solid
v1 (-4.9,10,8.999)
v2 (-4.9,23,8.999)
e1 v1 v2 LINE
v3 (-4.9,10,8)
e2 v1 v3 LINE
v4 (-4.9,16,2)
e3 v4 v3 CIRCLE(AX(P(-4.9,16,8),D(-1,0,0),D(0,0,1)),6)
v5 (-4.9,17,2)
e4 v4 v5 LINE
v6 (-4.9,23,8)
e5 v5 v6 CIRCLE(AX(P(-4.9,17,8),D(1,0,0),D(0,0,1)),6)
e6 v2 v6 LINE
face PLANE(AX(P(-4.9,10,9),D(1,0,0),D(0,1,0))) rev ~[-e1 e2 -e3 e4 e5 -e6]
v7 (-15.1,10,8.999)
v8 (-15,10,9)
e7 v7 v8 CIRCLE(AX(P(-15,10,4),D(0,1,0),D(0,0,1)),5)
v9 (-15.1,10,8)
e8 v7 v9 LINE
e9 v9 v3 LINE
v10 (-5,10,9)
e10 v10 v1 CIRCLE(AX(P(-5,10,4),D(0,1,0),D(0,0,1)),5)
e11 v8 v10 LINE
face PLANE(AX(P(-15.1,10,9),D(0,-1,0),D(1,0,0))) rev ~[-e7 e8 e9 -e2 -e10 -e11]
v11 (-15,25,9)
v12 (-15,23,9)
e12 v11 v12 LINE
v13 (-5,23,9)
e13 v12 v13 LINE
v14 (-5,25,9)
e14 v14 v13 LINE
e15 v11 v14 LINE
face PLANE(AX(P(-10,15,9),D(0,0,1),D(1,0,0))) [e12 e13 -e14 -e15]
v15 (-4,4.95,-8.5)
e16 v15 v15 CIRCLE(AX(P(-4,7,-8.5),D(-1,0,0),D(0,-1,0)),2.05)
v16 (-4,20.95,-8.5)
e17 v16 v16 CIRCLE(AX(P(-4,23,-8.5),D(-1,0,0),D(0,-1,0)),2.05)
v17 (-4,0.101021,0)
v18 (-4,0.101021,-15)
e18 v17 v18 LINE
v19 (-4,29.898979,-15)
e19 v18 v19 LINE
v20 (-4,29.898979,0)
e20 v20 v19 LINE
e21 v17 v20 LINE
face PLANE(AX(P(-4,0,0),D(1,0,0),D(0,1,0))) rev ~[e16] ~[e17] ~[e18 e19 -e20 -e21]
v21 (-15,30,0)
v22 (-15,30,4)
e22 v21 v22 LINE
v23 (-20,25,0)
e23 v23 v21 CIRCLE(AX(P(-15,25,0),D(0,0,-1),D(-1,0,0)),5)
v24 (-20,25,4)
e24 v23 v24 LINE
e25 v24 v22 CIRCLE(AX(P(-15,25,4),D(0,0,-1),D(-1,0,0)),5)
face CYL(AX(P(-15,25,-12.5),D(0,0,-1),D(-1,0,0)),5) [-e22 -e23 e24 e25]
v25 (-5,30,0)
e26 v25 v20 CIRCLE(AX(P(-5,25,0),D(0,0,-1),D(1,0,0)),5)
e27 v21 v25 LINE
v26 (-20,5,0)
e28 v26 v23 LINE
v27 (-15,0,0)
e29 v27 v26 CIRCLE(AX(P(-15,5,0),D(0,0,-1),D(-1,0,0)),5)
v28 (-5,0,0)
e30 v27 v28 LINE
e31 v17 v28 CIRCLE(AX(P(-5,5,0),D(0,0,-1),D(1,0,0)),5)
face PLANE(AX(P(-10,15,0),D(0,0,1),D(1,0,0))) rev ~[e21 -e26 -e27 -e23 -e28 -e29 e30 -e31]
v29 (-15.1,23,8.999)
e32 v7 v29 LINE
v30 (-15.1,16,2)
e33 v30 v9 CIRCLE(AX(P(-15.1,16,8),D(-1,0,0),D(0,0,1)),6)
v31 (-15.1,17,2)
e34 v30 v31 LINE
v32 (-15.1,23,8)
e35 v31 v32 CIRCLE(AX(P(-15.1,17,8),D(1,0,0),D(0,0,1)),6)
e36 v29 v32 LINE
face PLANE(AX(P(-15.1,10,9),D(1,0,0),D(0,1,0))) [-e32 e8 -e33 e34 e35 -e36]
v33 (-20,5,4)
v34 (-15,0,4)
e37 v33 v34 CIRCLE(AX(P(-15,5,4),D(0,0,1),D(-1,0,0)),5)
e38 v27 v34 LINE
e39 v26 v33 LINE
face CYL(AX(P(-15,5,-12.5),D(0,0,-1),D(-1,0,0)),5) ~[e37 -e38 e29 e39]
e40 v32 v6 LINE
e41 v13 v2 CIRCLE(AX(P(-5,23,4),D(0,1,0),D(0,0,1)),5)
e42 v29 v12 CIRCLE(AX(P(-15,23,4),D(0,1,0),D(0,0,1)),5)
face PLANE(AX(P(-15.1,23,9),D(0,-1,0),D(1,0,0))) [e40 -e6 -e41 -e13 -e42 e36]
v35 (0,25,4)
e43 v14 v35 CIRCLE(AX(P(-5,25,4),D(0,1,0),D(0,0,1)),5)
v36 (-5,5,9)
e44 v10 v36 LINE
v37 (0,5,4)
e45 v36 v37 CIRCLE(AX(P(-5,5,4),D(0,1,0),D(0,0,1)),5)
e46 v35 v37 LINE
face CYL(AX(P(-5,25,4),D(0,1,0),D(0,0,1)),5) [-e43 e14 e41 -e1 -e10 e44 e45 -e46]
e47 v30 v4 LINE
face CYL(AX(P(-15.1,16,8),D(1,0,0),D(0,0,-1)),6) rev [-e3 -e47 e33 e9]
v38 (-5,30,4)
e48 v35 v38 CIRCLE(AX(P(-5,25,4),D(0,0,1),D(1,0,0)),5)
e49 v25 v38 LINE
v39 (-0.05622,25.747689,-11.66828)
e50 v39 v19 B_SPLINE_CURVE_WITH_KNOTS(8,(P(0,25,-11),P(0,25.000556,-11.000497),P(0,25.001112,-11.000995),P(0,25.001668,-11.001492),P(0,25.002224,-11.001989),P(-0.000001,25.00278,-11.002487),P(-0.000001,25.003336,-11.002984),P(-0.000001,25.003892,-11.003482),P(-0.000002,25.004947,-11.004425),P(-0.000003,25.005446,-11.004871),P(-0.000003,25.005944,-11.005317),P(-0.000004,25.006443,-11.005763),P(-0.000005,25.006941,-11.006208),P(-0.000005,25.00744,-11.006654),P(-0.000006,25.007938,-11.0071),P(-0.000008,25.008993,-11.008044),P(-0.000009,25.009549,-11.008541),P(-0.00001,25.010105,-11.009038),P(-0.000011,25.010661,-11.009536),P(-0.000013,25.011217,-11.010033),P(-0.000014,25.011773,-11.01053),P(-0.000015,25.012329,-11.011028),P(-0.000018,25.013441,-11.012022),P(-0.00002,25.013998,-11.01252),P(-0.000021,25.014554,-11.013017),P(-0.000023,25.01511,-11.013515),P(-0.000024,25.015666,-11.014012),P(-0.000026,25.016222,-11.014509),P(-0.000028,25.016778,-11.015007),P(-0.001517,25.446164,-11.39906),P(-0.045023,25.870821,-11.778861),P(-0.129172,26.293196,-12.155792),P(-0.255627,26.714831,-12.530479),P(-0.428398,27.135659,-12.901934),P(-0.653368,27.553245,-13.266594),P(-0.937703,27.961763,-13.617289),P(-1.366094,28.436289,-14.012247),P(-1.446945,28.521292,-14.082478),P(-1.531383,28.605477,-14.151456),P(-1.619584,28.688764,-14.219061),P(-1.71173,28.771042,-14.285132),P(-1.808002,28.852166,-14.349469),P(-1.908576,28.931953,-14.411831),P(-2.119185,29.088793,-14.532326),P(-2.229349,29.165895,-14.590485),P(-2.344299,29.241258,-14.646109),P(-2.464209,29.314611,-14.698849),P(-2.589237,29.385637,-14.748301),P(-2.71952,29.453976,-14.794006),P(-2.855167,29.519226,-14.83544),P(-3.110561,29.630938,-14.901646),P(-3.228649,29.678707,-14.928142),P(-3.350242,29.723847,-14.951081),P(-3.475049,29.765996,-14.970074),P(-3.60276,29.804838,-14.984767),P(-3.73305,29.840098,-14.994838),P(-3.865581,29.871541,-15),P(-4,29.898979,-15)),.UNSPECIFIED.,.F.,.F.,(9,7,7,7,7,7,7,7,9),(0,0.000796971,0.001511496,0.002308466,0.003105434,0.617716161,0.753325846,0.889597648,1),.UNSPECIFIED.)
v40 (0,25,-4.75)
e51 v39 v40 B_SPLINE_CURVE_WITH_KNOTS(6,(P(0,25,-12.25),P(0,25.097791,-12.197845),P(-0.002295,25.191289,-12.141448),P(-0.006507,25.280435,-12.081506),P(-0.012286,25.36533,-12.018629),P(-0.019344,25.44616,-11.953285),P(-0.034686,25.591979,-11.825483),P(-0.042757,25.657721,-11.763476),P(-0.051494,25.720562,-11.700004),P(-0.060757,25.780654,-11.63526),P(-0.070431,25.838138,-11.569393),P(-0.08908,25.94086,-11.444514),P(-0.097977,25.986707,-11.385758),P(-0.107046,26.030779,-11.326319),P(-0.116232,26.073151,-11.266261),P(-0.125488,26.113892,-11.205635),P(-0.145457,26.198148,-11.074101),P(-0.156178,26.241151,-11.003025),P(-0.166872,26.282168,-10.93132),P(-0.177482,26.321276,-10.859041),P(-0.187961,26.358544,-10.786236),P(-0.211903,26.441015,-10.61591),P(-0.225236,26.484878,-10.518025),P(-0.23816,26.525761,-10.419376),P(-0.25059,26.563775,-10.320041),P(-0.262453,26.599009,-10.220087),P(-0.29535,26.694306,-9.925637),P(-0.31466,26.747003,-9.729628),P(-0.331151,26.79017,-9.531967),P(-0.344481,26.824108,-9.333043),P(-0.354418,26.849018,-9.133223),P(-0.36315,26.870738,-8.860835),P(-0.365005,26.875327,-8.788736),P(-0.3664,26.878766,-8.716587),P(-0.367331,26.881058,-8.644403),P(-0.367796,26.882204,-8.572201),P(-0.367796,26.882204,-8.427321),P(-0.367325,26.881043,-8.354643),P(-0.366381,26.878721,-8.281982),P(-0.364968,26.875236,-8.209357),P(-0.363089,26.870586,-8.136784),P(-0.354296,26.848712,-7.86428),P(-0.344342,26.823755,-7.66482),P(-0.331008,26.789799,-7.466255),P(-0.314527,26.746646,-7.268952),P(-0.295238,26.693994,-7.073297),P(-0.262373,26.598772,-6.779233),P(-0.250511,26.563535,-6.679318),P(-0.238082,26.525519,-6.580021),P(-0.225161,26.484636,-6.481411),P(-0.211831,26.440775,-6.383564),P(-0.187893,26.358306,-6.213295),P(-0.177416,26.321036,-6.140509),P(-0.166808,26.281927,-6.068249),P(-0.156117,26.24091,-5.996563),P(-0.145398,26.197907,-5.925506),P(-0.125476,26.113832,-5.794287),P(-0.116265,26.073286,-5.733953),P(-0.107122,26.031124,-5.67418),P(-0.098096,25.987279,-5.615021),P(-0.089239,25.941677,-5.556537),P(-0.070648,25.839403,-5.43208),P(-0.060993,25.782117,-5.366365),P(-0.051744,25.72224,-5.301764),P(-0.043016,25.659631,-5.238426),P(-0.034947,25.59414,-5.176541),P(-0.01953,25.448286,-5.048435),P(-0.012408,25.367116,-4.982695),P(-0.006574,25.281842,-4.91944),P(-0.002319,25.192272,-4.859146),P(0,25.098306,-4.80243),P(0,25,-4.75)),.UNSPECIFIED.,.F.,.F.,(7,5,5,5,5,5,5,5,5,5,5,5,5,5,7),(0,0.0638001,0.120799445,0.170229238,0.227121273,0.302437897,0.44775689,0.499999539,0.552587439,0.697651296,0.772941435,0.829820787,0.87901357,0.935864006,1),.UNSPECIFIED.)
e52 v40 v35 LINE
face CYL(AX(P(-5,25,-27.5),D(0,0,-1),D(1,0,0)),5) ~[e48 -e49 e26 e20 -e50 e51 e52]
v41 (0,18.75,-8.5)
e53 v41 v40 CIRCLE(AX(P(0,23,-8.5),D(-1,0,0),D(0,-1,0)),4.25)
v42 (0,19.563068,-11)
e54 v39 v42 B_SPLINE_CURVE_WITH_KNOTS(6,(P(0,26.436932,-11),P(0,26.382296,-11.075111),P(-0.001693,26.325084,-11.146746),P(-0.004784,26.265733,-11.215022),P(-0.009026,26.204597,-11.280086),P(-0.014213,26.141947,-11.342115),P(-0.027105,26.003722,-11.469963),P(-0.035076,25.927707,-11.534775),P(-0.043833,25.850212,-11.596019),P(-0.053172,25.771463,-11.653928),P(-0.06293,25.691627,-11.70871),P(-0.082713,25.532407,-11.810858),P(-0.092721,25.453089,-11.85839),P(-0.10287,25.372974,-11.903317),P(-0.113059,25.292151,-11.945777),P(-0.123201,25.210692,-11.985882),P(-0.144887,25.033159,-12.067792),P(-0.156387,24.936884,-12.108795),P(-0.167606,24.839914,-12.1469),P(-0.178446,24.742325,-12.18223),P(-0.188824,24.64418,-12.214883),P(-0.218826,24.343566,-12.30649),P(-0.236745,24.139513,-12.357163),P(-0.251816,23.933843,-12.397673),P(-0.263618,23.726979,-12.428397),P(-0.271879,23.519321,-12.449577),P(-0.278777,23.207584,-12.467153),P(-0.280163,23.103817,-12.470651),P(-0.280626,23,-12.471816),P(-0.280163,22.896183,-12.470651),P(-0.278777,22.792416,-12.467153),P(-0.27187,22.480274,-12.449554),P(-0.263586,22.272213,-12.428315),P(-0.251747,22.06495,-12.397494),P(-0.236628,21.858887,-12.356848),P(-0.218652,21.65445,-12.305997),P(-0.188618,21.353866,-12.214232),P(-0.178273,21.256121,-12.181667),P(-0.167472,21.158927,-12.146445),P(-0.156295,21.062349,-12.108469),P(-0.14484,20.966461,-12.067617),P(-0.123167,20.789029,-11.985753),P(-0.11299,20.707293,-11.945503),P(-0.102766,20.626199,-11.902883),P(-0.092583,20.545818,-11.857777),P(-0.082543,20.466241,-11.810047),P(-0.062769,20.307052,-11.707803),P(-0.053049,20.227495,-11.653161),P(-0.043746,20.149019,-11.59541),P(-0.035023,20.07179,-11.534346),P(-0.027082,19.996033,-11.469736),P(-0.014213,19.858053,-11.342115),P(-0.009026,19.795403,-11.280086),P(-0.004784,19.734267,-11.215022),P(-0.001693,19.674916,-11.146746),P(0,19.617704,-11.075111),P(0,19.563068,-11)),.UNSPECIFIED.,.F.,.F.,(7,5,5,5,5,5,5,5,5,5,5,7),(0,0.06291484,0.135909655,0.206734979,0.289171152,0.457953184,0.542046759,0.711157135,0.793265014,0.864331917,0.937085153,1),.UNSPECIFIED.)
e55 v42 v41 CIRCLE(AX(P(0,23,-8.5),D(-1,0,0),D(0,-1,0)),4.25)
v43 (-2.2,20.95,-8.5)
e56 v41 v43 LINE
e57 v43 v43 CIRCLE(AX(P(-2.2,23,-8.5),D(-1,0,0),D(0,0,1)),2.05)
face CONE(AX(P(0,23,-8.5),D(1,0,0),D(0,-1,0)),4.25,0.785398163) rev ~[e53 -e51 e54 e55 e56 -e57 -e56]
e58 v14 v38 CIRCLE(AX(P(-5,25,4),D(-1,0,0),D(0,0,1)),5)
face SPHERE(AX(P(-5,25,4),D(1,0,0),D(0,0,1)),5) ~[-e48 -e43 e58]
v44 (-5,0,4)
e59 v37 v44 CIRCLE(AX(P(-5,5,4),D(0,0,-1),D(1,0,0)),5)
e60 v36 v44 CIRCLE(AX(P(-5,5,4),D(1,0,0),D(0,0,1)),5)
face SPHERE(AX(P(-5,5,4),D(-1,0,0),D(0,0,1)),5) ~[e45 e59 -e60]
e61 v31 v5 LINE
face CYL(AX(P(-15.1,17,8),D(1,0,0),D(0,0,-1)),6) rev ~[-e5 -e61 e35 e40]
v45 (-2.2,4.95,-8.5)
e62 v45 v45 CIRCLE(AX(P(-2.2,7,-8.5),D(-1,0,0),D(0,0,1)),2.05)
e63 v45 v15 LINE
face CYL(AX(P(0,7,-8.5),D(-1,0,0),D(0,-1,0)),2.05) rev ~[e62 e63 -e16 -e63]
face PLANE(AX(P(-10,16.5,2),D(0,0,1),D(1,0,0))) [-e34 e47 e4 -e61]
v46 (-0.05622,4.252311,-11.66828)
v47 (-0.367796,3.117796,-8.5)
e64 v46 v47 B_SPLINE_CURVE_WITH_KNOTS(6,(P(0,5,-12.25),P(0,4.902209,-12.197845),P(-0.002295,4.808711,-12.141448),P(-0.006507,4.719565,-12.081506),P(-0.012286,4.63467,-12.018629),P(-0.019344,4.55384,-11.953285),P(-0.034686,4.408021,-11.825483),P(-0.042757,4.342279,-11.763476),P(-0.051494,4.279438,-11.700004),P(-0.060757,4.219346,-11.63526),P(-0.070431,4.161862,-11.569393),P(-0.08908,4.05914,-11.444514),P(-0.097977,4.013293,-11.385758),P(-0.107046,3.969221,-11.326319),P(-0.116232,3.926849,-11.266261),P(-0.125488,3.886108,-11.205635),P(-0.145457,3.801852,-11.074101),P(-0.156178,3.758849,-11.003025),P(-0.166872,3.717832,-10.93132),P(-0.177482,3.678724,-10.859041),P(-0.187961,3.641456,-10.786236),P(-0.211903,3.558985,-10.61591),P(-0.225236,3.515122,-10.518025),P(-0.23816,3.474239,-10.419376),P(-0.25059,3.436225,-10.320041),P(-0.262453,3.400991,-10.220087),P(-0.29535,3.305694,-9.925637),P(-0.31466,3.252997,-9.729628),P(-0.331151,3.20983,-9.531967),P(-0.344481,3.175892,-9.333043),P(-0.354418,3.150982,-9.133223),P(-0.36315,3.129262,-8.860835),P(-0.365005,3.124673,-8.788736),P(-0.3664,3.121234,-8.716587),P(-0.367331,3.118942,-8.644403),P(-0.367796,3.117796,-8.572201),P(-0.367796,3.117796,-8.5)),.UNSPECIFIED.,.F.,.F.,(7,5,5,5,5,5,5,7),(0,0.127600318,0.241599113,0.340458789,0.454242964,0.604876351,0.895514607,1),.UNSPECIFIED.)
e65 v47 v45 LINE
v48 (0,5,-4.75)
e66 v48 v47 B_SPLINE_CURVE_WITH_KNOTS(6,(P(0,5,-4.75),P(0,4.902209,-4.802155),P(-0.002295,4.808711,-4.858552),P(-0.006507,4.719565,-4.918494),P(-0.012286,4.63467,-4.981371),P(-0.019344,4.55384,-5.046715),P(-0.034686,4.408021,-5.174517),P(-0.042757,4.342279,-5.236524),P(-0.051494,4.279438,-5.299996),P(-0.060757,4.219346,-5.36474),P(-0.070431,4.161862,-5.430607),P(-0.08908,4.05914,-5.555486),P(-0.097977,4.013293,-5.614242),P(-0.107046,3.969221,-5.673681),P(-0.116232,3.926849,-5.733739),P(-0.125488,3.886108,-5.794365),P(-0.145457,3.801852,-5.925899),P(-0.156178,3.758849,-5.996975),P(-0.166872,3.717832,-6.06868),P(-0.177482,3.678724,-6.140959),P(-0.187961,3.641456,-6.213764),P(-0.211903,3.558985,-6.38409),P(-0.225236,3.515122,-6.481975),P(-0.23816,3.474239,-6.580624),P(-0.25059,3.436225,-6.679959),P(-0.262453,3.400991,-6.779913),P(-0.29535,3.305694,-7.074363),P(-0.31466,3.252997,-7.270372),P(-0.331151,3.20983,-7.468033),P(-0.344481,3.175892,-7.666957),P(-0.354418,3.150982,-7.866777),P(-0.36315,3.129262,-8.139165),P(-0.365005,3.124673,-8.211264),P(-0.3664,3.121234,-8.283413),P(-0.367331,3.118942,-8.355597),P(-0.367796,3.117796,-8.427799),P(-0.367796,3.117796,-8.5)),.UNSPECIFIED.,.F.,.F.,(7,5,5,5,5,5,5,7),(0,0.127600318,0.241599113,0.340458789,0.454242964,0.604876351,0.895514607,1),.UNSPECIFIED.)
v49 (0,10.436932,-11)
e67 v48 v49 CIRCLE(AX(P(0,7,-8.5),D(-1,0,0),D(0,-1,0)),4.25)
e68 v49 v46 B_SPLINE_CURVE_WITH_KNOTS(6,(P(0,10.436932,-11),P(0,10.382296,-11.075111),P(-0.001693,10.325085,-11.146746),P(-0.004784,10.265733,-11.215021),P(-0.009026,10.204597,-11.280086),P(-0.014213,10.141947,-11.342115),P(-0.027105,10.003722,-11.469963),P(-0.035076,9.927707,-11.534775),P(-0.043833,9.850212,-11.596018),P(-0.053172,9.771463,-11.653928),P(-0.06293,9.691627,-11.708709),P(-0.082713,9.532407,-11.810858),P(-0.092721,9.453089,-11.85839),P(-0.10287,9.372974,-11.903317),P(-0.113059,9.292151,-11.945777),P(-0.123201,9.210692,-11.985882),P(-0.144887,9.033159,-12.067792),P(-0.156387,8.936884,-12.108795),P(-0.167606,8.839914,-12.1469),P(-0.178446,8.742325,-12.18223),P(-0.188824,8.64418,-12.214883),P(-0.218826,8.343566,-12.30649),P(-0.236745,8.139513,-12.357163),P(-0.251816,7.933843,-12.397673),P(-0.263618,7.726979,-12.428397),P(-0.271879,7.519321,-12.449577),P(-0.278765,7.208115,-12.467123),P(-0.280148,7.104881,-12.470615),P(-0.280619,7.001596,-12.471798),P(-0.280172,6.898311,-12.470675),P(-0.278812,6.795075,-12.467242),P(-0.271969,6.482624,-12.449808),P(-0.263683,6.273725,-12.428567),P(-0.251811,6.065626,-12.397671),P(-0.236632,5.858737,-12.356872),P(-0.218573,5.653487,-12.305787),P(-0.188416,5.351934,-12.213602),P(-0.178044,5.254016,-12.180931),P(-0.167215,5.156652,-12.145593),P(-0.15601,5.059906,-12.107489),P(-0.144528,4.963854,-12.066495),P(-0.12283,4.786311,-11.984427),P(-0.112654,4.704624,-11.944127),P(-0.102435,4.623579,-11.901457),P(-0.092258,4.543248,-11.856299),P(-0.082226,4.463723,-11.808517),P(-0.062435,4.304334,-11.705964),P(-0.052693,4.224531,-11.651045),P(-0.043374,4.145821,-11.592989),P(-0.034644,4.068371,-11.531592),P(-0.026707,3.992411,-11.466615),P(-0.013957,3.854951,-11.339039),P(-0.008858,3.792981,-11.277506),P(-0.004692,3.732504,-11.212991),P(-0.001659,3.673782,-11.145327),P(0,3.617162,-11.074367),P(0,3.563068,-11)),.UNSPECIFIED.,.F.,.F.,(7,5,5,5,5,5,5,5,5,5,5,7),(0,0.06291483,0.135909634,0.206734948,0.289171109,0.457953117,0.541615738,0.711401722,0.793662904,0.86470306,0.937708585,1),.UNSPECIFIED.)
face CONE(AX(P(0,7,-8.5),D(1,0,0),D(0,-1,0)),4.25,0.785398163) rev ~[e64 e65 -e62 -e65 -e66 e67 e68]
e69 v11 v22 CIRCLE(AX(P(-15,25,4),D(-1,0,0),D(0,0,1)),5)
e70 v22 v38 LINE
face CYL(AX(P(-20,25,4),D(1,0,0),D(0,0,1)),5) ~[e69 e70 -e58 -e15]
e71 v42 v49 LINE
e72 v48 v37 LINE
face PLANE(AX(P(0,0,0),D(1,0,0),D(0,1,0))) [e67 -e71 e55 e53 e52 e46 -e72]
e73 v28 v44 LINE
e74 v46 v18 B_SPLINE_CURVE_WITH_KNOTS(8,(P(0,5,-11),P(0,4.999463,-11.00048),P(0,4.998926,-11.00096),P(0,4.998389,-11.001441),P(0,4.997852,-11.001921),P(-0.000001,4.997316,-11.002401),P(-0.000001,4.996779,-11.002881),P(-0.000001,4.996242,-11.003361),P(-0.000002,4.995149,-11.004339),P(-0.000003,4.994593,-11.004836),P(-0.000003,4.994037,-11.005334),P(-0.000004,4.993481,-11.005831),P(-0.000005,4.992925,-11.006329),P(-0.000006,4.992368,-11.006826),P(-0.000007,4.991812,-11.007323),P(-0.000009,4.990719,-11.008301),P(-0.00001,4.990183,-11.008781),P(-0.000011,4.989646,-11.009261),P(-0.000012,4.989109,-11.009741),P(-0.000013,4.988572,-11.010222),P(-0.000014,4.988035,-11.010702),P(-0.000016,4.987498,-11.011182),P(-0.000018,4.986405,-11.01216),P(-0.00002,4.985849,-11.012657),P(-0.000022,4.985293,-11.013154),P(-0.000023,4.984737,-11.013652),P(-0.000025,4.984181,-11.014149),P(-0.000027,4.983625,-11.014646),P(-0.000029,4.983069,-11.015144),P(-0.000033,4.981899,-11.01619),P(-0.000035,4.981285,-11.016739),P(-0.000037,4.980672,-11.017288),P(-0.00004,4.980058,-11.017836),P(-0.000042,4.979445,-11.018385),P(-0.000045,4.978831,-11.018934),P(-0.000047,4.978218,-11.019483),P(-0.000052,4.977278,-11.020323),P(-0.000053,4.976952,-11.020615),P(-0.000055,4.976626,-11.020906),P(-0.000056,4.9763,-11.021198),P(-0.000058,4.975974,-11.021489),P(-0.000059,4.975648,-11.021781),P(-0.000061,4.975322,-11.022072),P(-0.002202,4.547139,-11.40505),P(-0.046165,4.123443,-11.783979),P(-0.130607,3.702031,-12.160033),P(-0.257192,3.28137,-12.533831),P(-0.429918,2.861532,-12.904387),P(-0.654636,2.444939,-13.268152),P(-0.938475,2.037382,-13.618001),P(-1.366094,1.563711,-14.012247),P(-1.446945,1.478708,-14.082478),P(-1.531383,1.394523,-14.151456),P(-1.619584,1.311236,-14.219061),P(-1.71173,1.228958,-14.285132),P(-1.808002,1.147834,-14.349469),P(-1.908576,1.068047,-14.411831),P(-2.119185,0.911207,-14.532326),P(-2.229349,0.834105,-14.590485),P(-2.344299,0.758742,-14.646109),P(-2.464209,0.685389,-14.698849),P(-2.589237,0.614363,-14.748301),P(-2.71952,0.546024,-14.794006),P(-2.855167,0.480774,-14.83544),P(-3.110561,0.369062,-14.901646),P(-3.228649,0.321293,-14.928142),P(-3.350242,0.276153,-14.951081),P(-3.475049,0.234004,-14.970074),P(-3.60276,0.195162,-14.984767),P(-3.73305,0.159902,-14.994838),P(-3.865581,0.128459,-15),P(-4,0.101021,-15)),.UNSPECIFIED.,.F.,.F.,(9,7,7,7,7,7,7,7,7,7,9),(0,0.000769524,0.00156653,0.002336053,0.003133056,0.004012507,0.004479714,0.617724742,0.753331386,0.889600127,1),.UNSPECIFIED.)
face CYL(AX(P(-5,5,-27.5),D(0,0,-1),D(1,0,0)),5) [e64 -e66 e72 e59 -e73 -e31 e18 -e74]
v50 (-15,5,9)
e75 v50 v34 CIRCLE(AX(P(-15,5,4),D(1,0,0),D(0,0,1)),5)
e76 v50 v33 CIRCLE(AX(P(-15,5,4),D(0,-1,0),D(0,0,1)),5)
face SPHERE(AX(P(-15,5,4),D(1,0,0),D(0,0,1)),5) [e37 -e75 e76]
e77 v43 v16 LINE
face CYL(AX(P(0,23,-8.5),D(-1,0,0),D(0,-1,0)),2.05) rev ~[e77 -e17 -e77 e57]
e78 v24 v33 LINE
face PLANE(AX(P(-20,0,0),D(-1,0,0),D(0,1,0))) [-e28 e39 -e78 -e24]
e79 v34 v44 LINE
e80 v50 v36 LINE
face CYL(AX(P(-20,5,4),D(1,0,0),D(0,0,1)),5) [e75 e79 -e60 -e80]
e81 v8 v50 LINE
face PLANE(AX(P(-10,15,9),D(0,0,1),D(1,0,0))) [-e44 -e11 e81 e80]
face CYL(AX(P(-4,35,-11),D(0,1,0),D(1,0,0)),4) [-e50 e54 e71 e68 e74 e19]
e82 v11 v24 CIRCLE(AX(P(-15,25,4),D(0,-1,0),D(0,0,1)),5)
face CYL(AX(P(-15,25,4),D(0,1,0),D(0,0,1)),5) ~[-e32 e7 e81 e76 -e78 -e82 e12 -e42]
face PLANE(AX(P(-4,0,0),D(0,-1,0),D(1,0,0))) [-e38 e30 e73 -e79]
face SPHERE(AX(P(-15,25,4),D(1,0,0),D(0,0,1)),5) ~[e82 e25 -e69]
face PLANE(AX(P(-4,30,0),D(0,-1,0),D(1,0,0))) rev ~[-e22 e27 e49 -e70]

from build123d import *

# Parameters (mm, degrees)
F0_W            = 20
F0_H            = 30
F1_DEPTH        = 9
F4_W            = 10.2
F4_H            = 13
F5_DEPTH        = 7
F2_W            = 4
F2_H            = 30
F6_DEPTH        = 15
F7_R            = 6
F10_D           = 4.1
F10_CSINK_D     = 8.5
F10_CSINK_ANGLE = 90
F11_F1_R        = 5
F11_F2_R        = 5
F11_T3_DEPTH    = 20
F11_T5_DEPTH    = 16.5
F11_T8_ANGLE    = 90
F11_T10_ANGLE   = 90
F11_T11_DEPTH   = 20
F11_T13_DEPTH   = 31.5
F11_T16_ANGLE   = 90
F11_T18_ANGLE   = 90
F13_T1_DEPTH    = 40


# Not quite as in the source:
# - a fillet or chamfer that OpenCascade refuses, or shapes differently, is made with other operations: its cross-section is extruded or revolved along the edge and cut away or added
# - a feature of the source that left no trace in its solid (it failed there, or was rolled back) is left out


with BuildPart() as f1:
    # F0 (on Top) → F1 (new body)
    with BuildSketch(Plane.XY):
        with Locations((-10, 15)):
            Rectangle(F0_W, F0_H)
    extrude(amount=F1_DEPTH)

    # F4 (on offset) → F5 (cut)
    with BuildSketch(Plane.XY.offset(9)):
        with Locations((-10, 16.5)):
            Rectangle(F4_W, F4_H)
    extrude(amount=-F5_DEPTH, mode=Mode.SUBTRACT)

    # F2 (on Top) → F6 (join)
    with BuildSketch(Plane.XY):
        with Locations((-2, 15)):
            Rectangle(F2_W, F2_H)
    extrude(amount=-F6_DEPTH)

    # F7
    f7_edges = [f1.edges().sort_by_distance(p)[0] for p in [
        (-10, 10, 2),
        (-10, 23, 2),
    ]]
    fillet(f7_edges, radius=F7_R)

    # F10 (through all)
    with Locations(Plane.YZ):
        with Locations((7, -8.5), (23, -8.5)):
            CounterSinkHole(F10_D / 2, F10_CSINK_D / 2, counter_sink_angle=F10_CSINK_ANGLE)

    # F11: fillet of radius 5 on 4 edges, made by hand

    # F11_f1
    f11_f1_edges = [f1.edges().sort_by_distance(p)[0] for p in [
        (-10, 0, 9),
    ]]
    fillet(f11_f1_edges, radius=F11_F1_R)

    # F11_f2
    f11_f2_edges = [f1.edges().sort_by_distance(p)[0] for p in [
        (-10, 30, 9),
    ]]
    fillet(f11_f2_edges, radius=F11_F2_R)

    # F11_s4 → F11_t3 (cut)
    with BuildSketch(Plane.XZ.offset(-25)):
        with BuildLine():
            ThreePointArc((-15, 9), (-18.5355339059, 7.5355339059), (-20, 4))
            Line((-20, 4), (-20.1, 4))
            Line((-20.1, 4), (-20.1, 9.1))
            Line((-20.1, 9.1), (-15, 9.1))
            Line((-15, 9.1), (-15, 9))
        make_face()
    extrude(amount=F11_T3_DEPTH, mode=Mode.SUBTRACT)

    # F11_s6 → F11_t5 (cut)
    with BuildSketch(Plane.XY.offset(-12.5)):
        with BuildLine():
            ThreePointArc((-20, 5), (-18.5355339059, 1.4644660941), (-15, 0))
            Line((-15, 0), (-15, -0.1))
            Line((-15, -0.1), (-20.1, -0.1))
            Line((-20.1, -0.1), (-20.1, 5))
            Line((-20.1, 5), (-20, 5))
        make_face()
        with BuildLine():
            ThreePointArc((-20, 25), (-18.5355339059, 28.5355339059), (-15, 30))
            Line((-15, 30), (-15, 30.1))
            Line((-15, 30.1), (-20.1, 30.1))
            Line((-20.1, 30.1), (-20.1, 25))
            Line((-20.1, 25), (-20, 25))
        make_face()
    extrude(amount=F11_T5_DEPTH, mode=Mode.SUBTRACT)

    # F11_s7 → F11_t8 (revolve, cut)
    with BuildSketch(Plane.XZ.offset(-25)):
        with BuildLine():
            ThreePointArc((-20, 4), (-18.5355339059, 7.5355339059), (-15, 9))
            Line((-15, 9), (-15, 9.1))
            Line((-15, 9.1), (-20.1, 9.1))
            Line((-20.1, 9.1), (-20.1, 4))
            Line((-20.1, 4), (-20, 4))
        make_face()
    revolve(axis=Axis((-20, 25, 4), (-1, 0, 0)), revolution_arc=F11_T8_ANGLE, mode=Mode.SUBTRACT)

    # F11_s9 → F11_t10 (revolve, cut)
    with BuildSketch(Plane.XZ.offset(-5)):
        with BuildLine():
            ThreePointArc((-20, 4), (-18.5355339059, 7.5355339059), (-15, 9))
            Line((-15, 9), (-15, 9.1))
            Line((-15, 9.1), (-20.1, 9.1))
            Line((-20.1, 9.1), (-20.1, 4))
            Line((-20.1, 4), (-20, 4))
        make_face()
    revolve(axis=Axis((-20, 5, 4), (1, 0, 0)), revolution_arc=F11_T10_ANGLE, mode=Mode.SUBTRACT)

    # F11_s12 → F11_t11 (cut)
    with BuildSketch(Plane.XZ.offset(-25)):
        with BuildLine():
            ThreePointArc((-5, 9), (-1.4644660941, 7.5355339059), (0, 4))
            Line((0, 4), (0.1, 4))
            Line((0.1, 4), (0.1, 9.1))
            Line((0.1, 9.1), (-5, 9.1))
            Line((-5, 9.1), (-5, 9))
        make_face()
    extrude(amount=F11_T11_DEPTH, mode=Mode.SUBTRACT)

    # F11_s14 → F11_t13 (cut)
    with BuildSketch(Plane.XY.offset(-27.5)):
        with BuildLine():
            ThreePointArc((0, 25), (-1.4644660941, 28.5355339059), (-5, 30))
            Line((-5, 30), (-5, 30.1))
            Line((-5, 30.1), (0.1, 30.1))
            Line((0.1, 30.1), (0.1, 25))
            Line((0.1, 25), (0, 25))
        make_face()
        with BuildLine():
            ThreePointArc((0, 5), (-1.4644660941, 1.4644660941), (-5, 0))
            Line((-5, 0), (-5, -0.1))
            Line((-5, -0.1), (0.1, -0.1))
            Line((0.1, -0.1), (0.1, 5))
            Line((0.1, 5), (0, 5))
        make_face()
    extrude(amount=F11_T13_DEPTH, mode=Mode.SUBTRACT)

    # F11_s15 → F11_t16 (revolve, cut)
    with BuildSketch(Plane.XZ.offset(-5)):
        with BuildLine():
            ThreePointArc((0, 4), (-1.4644660941, 7.5355339059), (-5, 9))
            Line((-5, 9), (-5, 9.1))
            Line((-5, 9.1), (0.1, 9.1))
            Line((0.1, 9.1), (0.1, 4))
            Line((0.1, 4), (0, 4))
        make_face()
    revolve(axis=Axis((0, 5, 4), (1, 0, 0)), revolution_arc=F11_T16_ANGLE, mode=Mode.SUBTRACT)

    # F11_s17 → F11_t18 (revolve, cut)
    with BuildSketch(Plane.XZ.offset(-25)):
        with BuildLine():
            ThreePointArc((-5, 9), (-1.4644660941, 7.5355339059), (0, 4))
            Line((0, 4), (0.1, 4))
            Line((0.1, 4), (0.1, 9.1))
            Line((0.1, 9.1), (-5, 9.1))
            Line((-5, 9.1), (-5, 9))
        make_face()
    revolve(axis=Axis((0, 25, 4), (-1, 0, 0)), revolution_arc=F11_T18_ANGLE, mode=Mode.SUBTRACT)

    # F13: fillet of radius 4 on 1 edges, made by hand

    # F13_s2 → F13_t1 (cut)
    with BuildSketch(Plane.XZ.offset(-35)):
        with BuildLine():
            ThreePointArc((0, -11), (-1.1715728753, -13.8284271247), (-4, -15))
            Line((-4, -15), (0, -15))
            Line((0, -15), (0, -11))
        make_face()
    extrude(amount=F13_T1_DEPTH, mode=Mode.SUBTRACT)


solid = f1.part
